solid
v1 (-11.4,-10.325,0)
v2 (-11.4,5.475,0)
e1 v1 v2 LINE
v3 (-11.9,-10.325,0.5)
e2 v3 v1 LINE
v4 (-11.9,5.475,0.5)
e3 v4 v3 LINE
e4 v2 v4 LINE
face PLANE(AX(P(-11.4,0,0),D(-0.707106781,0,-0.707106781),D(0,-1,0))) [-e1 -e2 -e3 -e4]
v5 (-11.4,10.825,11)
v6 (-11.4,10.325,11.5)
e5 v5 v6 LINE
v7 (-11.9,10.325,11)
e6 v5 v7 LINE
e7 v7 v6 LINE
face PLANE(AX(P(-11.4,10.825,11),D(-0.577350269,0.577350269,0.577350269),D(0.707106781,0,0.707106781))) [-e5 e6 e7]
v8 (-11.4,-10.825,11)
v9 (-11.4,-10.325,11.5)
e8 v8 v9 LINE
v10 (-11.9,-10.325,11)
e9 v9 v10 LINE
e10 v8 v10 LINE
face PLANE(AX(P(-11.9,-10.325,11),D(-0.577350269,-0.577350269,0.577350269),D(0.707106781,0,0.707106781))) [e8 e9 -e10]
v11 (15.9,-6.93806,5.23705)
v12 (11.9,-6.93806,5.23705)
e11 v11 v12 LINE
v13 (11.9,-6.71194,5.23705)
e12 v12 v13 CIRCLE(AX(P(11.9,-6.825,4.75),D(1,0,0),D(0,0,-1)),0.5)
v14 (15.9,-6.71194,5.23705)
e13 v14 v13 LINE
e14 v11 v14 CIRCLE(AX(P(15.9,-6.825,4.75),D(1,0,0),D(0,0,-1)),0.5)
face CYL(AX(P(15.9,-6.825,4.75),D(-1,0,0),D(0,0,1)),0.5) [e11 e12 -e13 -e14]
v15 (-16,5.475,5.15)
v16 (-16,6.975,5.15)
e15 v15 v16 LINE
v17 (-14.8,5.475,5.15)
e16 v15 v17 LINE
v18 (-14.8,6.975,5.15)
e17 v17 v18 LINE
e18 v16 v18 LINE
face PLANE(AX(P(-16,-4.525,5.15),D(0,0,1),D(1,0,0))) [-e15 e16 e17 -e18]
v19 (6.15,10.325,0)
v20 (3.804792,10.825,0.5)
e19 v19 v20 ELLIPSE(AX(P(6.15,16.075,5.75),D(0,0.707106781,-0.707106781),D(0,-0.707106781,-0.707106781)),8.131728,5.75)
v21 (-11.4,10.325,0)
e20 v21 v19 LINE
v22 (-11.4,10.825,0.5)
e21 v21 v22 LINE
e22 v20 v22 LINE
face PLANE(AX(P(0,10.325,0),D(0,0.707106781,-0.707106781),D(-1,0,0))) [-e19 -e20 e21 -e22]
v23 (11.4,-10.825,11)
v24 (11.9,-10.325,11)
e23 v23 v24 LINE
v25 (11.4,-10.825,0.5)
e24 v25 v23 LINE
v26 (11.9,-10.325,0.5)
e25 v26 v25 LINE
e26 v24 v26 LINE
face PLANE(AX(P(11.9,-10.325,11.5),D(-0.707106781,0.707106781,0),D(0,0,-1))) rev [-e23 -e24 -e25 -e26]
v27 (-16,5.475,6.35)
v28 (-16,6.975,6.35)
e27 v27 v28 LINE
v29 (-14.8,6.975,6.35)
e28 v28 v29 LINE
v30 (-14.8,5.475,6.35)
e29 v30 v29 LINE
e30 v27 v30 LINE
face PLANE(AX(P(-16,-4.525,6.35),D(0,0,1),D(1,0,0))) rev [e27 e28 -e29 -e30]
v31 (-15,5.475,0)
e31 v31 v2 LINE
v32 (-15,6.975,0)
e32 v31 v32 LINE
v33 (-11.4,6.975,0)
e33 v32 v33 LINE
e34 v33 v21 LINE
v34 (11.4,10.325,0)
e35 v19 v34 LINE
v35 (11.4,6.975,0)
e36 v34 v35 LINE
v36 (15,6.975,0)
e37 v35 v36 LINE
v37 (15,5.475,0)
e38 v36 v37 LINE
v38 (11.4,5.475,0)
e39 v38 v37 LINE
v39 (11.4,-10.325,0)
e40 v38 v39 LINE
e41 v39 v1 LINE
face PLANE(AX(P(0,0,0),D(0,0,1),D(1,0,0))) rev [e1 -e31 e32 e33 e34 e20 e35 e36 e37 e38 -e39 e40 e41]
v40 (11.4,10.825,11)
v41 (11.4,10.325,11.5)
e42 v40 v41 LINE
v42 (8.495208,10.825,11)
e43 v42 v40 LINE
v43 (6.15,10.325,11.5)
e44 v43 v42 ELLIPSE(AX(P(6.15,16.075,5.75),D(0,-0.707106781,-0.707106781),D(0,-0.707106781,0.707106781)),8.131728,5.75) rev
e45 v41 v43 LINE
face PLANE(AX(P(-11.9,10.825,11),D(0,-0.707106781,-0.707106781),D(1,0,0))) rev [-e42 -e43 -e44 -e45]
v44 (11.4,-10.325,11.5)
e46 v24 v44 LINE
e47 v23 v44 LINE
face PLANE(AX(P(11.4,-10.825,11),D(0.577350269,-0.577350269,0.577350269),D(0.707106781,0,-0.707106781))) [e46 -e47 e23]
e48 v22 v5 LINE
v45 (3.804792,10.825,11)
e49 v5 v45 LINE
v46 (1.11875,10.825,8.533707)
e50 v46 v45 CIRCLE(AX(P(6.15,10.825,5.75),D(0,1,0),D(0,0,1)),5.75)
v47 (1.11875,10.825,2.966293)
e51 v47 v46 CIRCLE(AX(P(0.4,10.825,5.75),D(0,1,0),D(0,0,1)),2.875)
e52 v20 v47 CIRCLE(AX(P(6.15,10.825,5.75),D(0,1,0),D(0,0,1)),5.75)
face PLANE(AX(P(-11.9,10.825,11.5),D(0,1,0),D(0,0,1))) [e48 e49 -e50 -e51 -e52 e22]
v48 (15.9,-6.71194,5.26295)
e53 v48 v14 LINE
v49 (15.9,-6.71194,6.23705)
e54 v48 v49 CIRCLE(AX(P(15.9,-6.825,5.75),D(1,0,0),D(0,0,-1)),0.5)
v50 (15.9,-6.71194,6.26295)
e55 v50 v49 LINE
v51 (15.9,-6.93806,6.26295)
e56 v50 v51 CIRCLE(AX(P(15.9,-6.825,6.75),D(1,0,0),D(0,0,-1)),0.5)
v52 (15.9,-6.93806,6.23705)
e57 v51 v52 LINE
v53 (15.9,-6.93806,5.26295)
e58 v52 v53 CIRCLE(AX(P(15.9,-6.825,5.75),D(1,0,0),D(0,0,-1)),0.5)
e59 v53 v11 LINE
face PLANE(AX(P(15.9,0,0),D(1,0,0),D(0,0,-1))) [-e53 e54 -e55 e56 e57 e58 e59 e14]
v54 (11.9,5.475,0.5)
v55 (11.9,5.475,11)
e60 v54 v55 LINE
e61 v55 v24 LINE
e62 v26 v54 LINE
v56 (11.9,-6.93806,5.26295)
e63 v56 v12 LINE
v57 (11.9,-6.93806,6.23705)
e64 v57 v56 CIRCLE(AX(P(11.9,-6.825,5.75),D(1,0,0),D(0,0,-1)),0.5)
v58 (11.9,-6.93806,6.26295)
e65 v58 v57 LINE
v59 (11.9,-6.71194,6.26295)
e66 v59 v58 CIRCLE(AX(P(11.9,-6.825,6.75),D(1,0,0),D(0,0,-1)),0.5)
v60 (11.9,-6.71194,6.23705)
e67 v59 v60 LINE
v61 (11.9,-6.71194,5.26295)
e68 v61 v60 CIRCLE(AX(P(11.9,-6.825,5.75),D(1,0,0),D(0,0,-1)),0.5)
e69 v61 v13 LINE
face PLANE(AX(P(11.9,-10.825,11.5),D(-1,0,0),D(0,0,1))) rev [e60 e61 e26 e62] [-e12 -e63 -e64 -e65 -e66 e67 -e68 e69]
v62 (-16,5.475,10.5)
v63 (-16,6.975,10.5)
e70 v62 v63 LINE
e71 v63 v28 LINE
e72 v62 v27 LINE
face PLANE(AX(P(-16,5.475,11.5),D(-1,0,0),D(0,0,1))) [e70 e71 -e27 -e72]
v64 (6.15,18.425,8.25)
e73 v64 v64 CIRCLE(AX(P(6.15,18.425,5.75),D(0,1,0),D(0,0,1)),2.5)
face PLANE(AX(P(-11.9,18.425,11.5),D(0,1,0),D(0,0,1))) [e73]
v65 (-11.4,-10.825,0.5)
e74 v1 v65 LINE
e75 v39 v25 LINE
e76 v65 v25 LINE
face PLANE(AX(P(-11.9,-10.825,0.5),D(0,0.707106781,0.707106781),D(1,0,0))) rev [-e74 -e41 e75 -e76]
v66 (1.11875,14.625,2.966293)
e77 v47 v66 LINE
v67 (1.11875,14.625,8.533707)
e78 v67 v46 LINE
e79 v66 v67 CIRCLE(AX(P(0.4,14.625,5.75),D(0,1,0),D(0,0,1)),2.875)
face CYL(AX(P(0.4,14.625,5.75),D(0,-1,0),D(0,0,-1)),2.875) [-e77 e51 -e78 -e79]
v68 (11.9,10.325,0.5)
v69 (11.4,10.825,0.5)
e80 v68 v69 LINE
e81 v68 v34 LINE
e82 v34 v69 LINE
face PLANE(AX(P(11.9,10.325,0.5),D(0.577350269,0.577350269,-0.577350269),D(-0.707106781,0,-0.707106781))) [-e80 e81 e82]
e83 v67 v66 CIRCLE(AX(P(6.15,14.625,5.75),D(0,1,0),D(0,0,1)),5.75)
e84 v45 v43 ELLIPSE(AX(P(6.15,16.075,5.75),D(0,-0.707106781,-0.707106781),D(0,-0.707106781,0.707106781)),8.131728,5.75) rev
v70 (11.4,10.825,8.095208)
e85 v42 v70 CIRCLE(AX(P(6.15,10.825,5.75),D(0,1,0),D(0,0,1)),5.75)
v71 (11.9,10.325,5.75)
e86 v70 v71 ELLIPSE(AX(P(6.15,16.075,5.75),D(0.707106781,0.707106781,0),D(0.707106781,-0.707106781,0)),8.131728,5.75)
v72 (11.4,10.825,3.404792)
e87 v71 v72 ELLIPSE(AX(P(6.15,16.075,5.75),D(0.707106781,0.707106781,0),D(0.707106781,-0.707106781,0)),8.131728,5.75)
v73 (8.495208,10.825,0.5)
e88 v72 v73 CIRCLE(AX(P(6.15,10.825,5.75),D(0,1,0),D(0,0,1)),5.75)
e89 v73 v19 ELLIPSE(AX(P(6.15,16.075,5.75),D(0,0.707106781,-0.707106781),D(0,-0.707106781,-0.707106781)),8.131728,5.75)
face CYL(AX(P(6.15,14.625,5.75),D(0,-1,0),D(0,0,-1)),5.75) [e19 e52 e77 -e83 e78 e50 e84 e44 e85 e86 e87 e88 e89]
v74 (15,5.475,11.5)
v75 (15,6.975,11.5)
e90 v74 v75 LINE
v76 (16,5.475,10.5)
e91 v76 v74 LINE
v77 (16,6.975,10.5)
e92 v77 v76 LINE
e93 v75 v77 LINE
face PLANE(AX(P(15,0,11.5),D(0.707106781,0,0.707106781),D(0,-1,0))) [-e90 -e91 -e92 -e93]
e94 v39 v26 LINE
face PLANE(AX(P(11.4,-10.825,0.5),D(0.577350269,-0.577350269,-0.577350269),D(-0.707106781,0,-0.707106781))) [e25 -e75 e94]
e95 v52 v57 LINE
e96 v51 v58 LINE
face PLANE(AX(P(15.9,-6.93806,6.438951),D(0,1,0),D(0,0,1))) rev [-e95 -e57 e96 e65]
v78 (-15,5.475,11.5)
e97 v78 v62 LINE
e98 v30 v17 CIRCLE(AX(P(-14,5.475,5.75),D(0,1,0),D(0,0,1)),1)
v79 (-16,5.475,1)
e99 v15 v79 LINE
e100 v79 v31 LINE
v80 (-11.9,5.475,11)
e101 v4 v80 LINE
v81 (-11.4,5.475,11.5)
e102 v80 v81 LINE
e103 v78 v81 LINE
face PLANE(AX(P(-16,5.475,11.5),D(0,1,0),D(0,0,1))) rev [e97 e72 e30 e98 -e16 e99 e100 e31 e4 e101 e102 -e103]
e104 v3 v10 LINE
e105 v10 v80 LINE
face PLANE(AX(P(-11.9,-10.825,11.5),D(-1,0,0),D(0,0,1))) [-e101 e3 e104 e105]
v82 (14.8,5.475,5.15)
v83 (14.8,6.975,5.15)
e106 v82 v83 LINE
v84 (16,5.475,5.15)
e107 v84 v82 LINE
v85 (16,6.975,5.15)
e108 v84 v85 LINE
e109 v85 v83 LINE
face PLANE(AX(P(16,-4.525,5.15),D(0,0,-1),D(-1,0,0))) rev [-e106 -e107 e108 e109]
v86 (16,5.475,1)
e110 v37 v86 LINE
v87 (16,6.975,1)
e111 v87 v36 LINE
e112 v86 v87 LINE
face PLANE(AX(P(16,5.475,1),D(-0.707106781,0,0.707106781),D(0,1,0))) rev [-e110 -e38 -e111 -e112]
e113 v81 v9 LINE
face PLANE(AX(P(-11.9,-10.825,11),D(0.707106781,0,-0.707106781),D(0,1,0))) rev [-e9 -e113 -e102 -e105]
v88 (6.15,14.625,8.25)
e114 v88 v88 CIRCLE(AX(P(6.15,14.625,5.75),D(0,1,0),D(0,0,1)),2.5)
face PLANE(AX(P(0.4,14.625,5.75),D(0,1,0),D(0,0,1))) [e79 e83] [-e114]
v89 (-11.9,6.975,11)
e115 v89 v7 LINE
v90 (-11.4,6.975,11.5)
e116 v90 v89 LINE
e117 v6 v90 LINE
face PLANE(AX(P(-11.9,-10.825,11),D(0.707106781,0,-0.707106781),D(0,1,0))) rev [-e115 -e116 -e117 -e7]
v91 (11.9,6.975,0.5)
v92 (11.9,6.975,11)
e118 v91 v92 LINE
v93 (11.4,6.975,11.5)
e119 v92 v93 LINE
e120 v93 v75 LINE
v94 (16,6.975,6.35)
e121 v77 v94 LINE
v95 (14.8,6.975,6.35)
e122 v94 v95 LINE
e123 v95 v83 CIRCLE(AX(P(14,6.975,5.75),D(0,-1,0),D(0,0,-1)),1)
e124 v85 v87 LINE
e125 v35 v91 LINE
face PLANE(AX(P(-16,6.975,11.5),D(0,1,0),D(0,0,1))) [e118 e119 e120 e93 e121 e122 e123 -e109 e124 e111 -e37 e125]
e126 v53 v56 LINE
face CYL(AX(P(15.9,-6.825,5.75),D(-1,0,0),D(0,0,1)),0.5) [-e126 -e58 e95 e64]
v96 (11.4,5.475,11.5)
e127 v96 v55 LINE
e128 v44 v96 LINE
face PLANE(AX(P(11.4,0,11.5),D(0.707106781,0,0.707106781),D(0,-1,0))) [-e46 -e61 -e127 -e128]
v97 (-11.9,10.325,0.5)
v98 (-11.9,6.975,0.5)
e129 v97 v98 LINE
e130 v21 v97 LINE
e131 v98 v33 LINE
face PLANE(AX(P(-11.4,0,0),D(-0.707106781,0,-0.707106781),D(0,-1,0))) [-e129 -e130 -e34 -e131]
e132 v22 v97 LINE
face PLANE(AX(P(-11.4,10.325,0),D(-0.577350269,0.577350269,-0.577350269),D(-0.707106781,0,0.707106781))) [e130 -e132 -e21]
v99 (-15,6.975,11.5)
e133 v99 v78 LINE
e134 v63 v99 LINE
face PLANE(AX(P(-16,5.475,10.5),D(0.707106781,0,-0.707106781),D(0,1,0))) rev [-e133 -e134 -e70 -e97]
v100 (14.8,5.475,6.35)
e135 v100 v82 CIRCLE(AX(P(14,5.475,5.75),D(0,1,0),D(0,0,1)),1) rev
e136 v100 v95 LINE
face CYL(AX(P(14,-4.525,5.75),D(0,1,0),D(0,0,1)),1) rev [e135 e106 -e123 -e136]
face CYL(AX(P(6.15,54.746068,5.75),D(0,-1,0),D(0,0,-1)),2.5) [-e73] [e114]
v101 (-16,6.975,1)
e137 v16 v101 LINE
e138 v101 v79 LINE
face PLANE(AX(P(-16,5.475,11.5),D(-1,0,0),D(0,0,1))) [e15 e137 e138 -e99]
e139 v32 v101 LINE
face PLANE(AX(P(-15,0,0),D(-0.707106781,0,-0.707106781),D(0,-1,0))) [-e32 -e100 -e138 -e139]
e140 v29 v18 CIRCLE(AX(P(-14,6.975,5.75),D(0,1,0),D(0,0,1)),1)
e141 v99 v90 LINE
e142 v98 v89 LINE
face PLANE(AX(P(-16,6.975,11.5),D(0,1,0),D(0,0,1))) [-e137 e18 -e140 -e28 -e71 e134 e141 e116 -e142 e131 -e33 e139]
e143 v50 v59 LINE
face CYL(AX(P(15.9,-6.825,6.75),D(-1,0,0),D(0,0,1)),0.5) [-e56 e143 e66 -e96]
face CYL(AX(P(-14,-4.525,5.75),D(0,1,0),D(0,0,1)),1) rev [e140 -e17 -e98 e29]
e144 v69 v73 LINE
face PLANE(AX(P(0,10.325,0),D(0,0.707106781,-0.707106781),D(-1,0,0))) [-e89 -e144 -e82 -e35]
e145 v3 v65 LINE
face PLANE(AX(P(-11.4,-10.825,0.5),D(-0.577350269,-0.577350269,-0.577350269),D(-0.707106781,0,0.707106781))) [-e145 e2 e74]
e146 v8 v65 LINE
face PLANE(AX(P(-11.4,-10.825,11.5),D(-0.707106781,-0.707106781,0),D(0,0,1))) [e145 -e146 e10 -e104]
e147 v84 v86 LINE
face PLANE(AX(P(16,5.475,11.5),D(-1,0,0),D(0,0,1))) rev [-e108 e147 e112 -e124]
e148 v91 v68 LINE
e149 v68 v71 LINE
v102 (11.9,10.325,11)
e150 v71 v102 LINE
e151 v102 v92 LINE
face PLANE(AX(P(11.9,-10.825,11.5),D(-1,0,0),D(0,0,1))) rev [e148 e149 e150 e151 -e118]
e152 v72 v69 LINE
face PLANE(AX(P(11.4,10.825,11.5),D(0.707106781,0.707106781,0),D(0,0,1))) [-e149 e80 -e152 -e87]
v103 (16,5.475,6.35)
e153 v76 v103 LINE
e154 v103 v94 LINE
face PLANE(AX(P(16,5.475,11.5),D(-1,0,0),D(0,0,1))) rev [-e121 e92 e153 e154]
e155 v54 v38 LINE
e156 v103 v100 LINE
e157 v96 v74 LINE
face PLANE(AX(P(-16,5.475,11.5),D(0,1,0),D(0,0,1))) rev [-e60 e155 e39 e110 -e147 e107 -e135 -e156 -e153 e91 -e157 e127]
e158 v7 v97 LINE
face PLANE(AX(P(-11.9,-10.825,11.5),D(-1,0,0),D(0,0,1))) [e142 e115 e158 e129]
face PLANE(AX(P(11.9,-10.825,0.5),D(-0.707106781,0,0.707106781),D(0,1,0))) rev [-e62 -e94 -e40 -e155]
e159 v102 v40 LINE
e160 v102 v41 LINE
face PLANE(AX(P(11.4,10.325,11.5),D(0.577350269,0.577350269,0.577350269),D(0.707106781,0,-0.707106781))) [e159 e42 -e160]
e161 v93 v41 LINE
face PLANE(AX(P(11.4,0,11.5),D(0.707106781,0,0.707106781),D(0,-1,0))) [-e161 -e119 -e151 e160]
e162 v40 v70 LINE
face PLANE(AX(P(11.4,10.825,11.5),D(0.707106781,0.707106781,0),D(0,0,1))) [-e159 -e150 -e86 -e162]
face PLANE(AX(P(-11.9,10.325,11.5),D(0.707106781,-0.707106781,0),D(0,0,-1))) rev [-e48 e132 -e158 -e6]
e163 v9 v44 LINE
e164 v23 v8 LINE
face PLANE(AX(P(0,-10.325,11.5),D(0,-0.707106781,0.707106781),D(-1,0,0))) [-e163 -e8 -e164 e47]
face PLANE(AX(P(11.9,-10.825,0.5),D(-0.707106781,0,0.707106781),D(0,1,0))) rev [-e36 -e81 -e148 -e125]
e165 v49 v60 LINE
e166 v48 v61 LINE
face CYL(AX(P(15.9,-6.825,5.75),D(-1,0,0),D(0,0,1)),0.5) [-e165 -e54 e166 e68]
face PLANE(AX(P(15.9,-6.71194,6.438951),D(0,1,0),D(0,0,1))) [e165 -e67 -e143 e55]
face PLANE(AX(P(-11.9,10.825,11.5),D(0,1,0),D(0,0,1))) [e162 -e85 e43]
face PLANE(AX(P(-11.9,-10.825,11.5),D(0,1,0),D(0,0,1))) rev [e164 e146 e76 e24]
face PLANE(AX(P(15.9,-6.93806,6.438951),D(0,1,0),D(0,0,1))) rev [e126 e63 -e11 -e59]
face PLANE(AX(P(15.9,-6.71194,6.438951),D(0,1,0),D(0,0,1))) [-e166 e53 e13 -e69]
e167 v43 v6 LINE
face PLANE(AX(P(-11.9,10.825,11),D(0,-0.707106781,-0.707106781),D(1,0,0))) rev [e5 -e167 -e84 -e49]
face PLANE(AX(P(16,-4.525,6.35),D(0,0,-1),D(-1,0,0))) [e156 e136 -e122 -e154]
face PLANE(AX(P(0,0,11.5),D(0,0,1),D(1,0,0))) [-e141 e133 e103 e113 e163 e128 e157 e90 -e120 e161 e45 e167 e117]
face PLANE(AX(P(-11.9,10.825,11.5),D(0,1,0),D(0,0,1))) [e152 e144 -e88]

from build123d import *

# Parameters (mm, degrees)
SKETCH_1_W          = 23.8
SKETCH_1_H          = 21.65
SKETCH_1_W_2        = 32
SKETCH_1_H_2        = 1.5
EXTRUDE_1_DEPTH     = 11.5
SKETCH_2_R          = 1
SKETCH_2_W          = 1.2
SKETCH_2_H          = 1.2
CUT_EXTRUDE_1_DEPTH = 11.5
SKETCH_3_R          = 5.75
SKETCH_3_R_2        = 2.875
EXTRUDE_2_DEPTH     = 3.8
SKETCH_4_R          = 2.5
EXTRUDE_3_DEPTH     = 3.8
CHAMFER_1_SIZE      = 1
CHAMFER_2_SIZE      = 0.5
SKETCH_5_R          = 0.5
SKETCH_5_W          = 1.377901166
SKETCH_5_H          = 0.226119028
EXTRUDE_5_DEPTH     = 4


with BuildPart() as part:
    # Эскиз1 → Бобышка-Вытянуть1 (new body)
    with BuildSketch(Plane.XY):
        Rectangle(SKETCH_1_W, SKETCH_1_H)
        with Locations((0, 6.225)):
            Rectangle(SKETCH_1_W_2, SKETCH_1_H_2)
    extrude(amount=EXTRUDE_1_DEPTH)

    # Эскиз2 → Вырез-Вытянуть1 (cut)
    with BuildSketch(Plane(origin=(0, 6.975, 0), x_dir=(1, 0, 0), z_dir=(0, 1, 0))):
        with Locations((-14, -5.75)):
            Circle(SKETCH_2_R)
        with Locations((14, -5.75)):
            Circle(SKETCH_2_R)
        with Locations((-15.4, -5.75)):
            Rectangle(SKETCH_2_W, SKETCH_2_H)
        with Locations((15.4, -5.75)):
            Rectangle(SKETCH_2_W, SKETCH_2_H)
    extrude(amount=-CUT_EXTRUDE_1_DEPTH, mode=Mode.SUBTRACT)

    # Эскиз3 → Бобышка-Вытянуть2 (add)
    with BuildSketch(Plane(origin=(0, 10.825, 0), x_dir=(1, 0, 0), z_dir=(0, 1, 0))):
        with Locations((6.15, -5.75)):
            Circle(SKETCH_3_R)
        with Locations((0.4, -5.75)):
            Circle(SKETCH_3_R_2)
    extrude(amount=EXTRUDE_2_DEPTH)

    # Эскиз4 → Бобышка-Вытянуть3 (add)
    with BuildSketch(Plane(origin=(0, 14.625, 0), x_dir=(1, 0, 0), z_dir=(0, 1, 0))):
        with Locations(Location((6.15, -5.75, 0), (0, 0, 270))):
            Circle(SKETCH_4_R)
    extrude(amount=EXTRUDE_3_DEPTH)

    # Фаска1
    chamfer_1_edges = [part.edges().sort_by_distance(p)[0] for p in [
        (-16, 6.225, 11.5),
        (-16, 6.225, 0),
        (16, 6.225, 0),
        (16, 6.225, 11.5),
    ]]
    chamfer(chamfer_1_edges, length=CHAMFER_1_SIZE)

    # Фаска2
    # the kernel refuses this chamfer: 0.5 mm, written as the material it takes off along each edge
    with BuildSketch(Plane(origin=(11.566666667, -10.491666667, 0.333333333), x_dir=(0.7071067811865476, 0, 0.7071067811865475), z_dir=(0.5773502691896257, -0.5773502691896258, -0.5773502691896258)), Plane(origin=(-11.566666667, 10.491666667, 11.166666667), x_dir=(-0.7071067811865475, -0.7071067811865475, 0), z_dir=(-0.5773502691896258, 0.5773502691896258, 0.5773502691896258)), Plane(origin=(-11.566666667, -10.491666667, 0.333333333), x_dir=(0, -0.7071067811865476, 0.7071067811865475), z_dir=(-0.5773502691896257, -0.5773502691896257, -0.5773502691896258)), Plane(origin=(11.566666667, 10.491666667, 0.333333333), x_dir=(0, 0.7071067811865476, 0.7071067811865475), z_dir=(0.5773502691896257, 0.5773502691896257, -0.5773502691896258))) as chamfer_2_piece_1:
        Polygon((-0.353553391, -0.204124145), (0.353553391, -0.204124145), (0, 0.40824829), align=None)
    extrude(amount=0.635085296, mode=Mode.SUBTRACT)
    with BuildSketch(Plane(origin=(11.566666667, -10.491666667, 11.166666667), x_dir=(-0.7071067811865475, -0.7071067811865475, 0), z_dir=(0.5773502691896258, -0.5773502691896258, 0.5773502691896258)), Plane(origin=(11.566666667, 10.491666667, 11.166666667), x_dir=(0.7071067811865475, -0.7071067811865475, 0), z_dir=(0.5773502691896258, 0.5773502691896258, 0.5773502691896258)), Plane(origin=(-11.566666667, 10.491666667, 0.333333333), x_dir=(0, 0.7071067811865476, 0.7071067811865475), z_dir=(-0.5773502691896257, 0.5773502691896257, -0.5773502691896258)), Plane(origin=(-11.566666667, -10.491666667, 11.166666667), x_dir=(0, -0.7071067811865475, -0.7071067811865475), z_dir=(-0.5773502691896258, -0.5773502691896258, 0.5773502691896258))) as chamfer_2_piece_2:
        Polygon((-0.353553391, 0.204124145), (0.353553391, 0.204124145), (0, -0.40824829), align=None)
    extrude(amount=0.635085296, mode=Mode.SUBTRACT)
    with BuildSketch(Plane(origin=(11.9, -10.825, -1.285841494), x_dir=(0.027495876610585647, 0.9996219169112968, 0), z_dir=(0, 0, 1)), Plane(origin=(-11.9, -10.825, -1.285841494), x_dir=(0.9996219169112968, -0.027495876610585647, 0), z_dir=(0, 0, 1))) as chamfer_2_piece_3:
        Polygon((CHAMFER_2_SIZE * 0.999621916911, CHAMFER_2_SIZE * 0.0274958766106), (-CHAMFER_2_SIZE * 0.0274958766106, CHAMFER_2_SIZE * 0.999621916911), (0, 0), align=None)
    extrude(amount=14.071682988, mode=Mode.SUBTRACT)
    with BuildSketch(Plane(origin=(11.9, 10.825, 5.75), x_dir=(0.027495876610585647, -0.9996219169112968, 0), z_dir=(0, 0, 1))) as chamfer_2_piece_4_section:
        Polygon((CHAMFER_2_SIZE * 0.999621916911, -CHAMFER_2_SIZE * 0.0274958766106), (-CHAMFER_2_SIZE * 0.0274958766106, -CHAMFER_2_SIZE * 0.999621916911), (0, 0), align=None)
    chamfer_2_piece_4 = extrude(amount=7.035841494, mode=Mode.PRIVATE)
    chamfer_2_piece_4 = chamfer_2_piece_4 - Plane(origin=(6.15, 10.65169011, 5.75), x_dir=(1, 0, 0), z_dir=(0, -1, 0)) * Cylinder(5.75, 17, mode=Mode.PRIVATE)
    add(chamfer_2_piece_4, mode=Mode.SUBTRACT)
    with BuildSketch(Plane(origin=(-11.9, 10.825, -1.285841494), x_dir=(0.9996219169112968, 0.027495876610585647, 0), z_dir=(0, 0, 1))) as chamfer_2_piece_5:
        Polygon((CHAMFER_2_SIZE * 0.999621916911, -CHAMFER_2_SIZE * 0.0274958766106), (-CHAMFER_2_SIZE * 0.0274958766106, -CHAMFER_2_SIZE * 0.999621916911), (0, 0), align=None)
    extrude(amount=14.071682988, mode=Mode.SUBTRACT)
    with BuildSketch(Plane(origin=(-11.9, 5.475, 11.5), x_dir=(-0.027495876610585647, 0, -0.9996219169112968), z_dir=(0, -1, 0)), Plane(origin=(11.9, -12.110841494, 11.5), x_dir=(0.027495876610585647, 0, -0.9996219169112968), z_dir=(0, 1, 0)), Plane(origin=(-11.9, 5.475, 0), x_dir=(0.9996219169112968, 0, -0.02749587661058639), z_dir=(0, -1, 0)), Plane(origin=(11.9, -12.110841494, 0), x_dir=(-0.9996219169112968, 0, -0.02749587661058639), z_dir=(0, 1, 0))) as chamfer_2_piece_6:
        Polygon((CHAMFER_2_SIZE * 0.999621916911, CHAMFER_2_SIZE * 0.0274958766106), (-CHAMFER_2_SIZE * 0.0274958766106, CHAMFER_2_SIZE * 0.999621916911), (0, 0), align=None)
    extrude(amount=17.585841494, mode=Mode.SUBTRACT)
    with BuildSketch(Plane(origin=(-11.9, 12.110841494, 11.5), x_dir=(-0.027495876610585647, 0, -0.9996219169112968), z_dir=(0, -1, 0)), Plane(origin=(11.9, 6.975, 11.5), x_dir=(0.027495876610585647, 0, -0.9996219169112968), z_dir=(0, 1, 0)), Plane(origin=(-11.9, 12.110841494, 0), x_dir=(0.9996219169112968, 0, -0.02749587661058639), z_dir=(0, -1, 0)), Plane(origin=(11.9, 6.975, 0), x_dir=(-0.9996219169112968, 0, -0.02749587661058639), z_dir=(0, 1, 0))) as chamfer_2_piece_7:
        Polygon((CHAMFER_2_SIZE * 0.999621916911, CHAMFER_2_SIZE * 0.0274958766106), (-CHAMFER_2_SIZE * 0.0274958766106, CHAMFER_2_SIZE * 0.999621916911), (0, 0), align=None)
    extrude(amount=5.135841494, mode=Mode.SUBTRACT)
    with BuildSketch(Plane(origin=(6.15, 10.825, 11.5), x_dir=(0, 0.027495876610585647, -0.9996219169112968), z_dir=(-1, 0, 0))) as chamfer_2_piece_8_section:
        Polygon((CHAMFER_2_SIZE * 0.999621916911, CHAMFER_2_SIZE * 0.0274958766106), (-CHAMFER_2_SIZE * 0.0274958766106, CHAMFER_2_SIZE * 0.999621916911), (0, 0), align=None)
    chamfer_2_piece_8 = extrude(amount=19.335841494, mode=Mode.PRIVATE)
    chamfer_2_piece_8 = chamfer_2_piece_8 - Plane(origin=(6.15, 10.656558796, 5.75), x_dir=(1, 0, 0), z_dir=(0, -1, 0)) * Cylinder(5.75, 41, mode=Mode.PRIVATE)
    add(chamfer_2_piece_8, mode=Mode.SUBTRACT)
    with BuildSketch(Plane(origin=(-13.185841494, -10.825, 11.5), x_dir=(0, -0.027495876610585647, -0.9996219169112968), z_dir=(1, 0, 0)), Plane(origin=(-13.185841494, -10.825, 0), x_dir=(0, 0.9996219169112968, -0.02749587661058639), z_dir=(1, 0, 0))) as chamfer_2_piece_9:
        Polygon((CHAMFER_2_SIZE * 0.999621916911, CHAMFER_2_SIZE * 0.0274958766106), (-CHAMFER_2_SIZE * 0.0274958766106, CHAMFER_2_SIZE * 0.999621916911), (0, 0), align=None)
    extrude(amount=26.371682988, mode=Mode.SUBTRACT)
    with BuildSketch(Plane(origin=(6.150000032, 10.825, 0), x_dir=(0, -0.9996219169112968, -0.02749587661058639), z_dir=(-1, 0, 0))) as chamfer_2_piece_10_section:
        Polygon((CHAMFER_2_SIZE * 0.999621916911, CHAMFER_2_SIZE * 0.0274958766106), (-CHAMFER_2_SIZE * 0.0274958766106, CHAMFER_2_SIZE * 0.999621916911), (0, 0), align=None)
    chamfer_2_piece_10 = extrude(amount=19.335841526, mode=Mode.PRIVATE)
    chamfer_2_piece_10 = chamfer_2_piece_10 - Plane(origin=(6.15, 10.656558796, 5.75), x_dir=(1, 0, 0), z_dir=(0, -1, 0)) * Cylinder(5.75, 41, mode=Mode.PRIVATE)
    add(chamfer_2_piece_10, mode=Mode.SUBTRACT)
    with BuildSketch(Plane(origin=(13.185841494, 10.825, 0), x_dir=(0, -0.9996219169112968, -0.02749587661058639), z_dir=(-1, 0, 0))) as chamfer_2_piece_11_section:
        Polygon((CHAMFER_2_SIZE * 0.999621916911, CHAMFER_2_SIZE * 0.0274958766106), (-CHAMFER_2_SIZE * 0.0274958766106, CHAMFER_2_SIZE * 0.999621916911), (0, 0), align=None)
    chamfer_2_piece_11 = extrude(amount=7.035841462, mode=Mode.PRIVATE)
    chamfer_2_piece_11 = chamfer_2_piece_11 - Plane(origin=(6.15, 10.65169011, 5.75), x_dir=(1, 0, 0), z_dir=(0, -1, 0)) * Cylinder(5.75, 17, mode=Mode.PRIVATE)
    add(chamfer_2_piece_11, mode=Mode.SUBTRACT)
    with BuildSketch(Plane(origin=(13.185841494, 10.825, 11.5), x_dir=(0, -0.9996219169112968, 0.027495876610585647), z_dir=(-1, 0, 0))) as chamfer_2_piece_12_section:
        Polygon((CHAMFER_2_SIZE * 0.999621916911, -CHAMFER_2_SIZE * 0.0274958766106), (-CHAMFER_2_SIZE * 0.0274958766106, -CHAMFER_2_SIZE * 0.999621916911), (0, 0), align=None)
    chamfer_2_piece_12 = extrude(amount=7.035841494, mode=Mode.PRIVATE)
    chamfer_2_piece_12 = chamfer_2_piece_12 - Plane(origin=(6.15, 10.65169011, 5.75), x_dir=(1, 0, 0), z_dir=(0, -1, 0)) * Cylinder(5.75, 17, mode=Mode.PRIVATE)
    add(chamfer_2_piece_12, mode=Mode.SUBTRACT)
    with BuildSketch(Plane(origin=(11.9, 10.825, -1.285841494), x_dir=(0.027495876610585647, -0.9996219169112968, 0), z_dir=(0, 0, 1))) as chamfer_2_piece_13_section:
        Polygon((CHAMFER_2_SIZE * 0.999621916911, -CHAMFER_2_SIZE * 0.0274958766106), (-CHAMFER_2_SIZE * 0.0274958766106, -CHAMFER_2_SIZE * 0.999621916911), (0, 0), align=None)
    chamfer_2_piece_13 = extrude(amount=7.035841494, mode=Mode.PRIVATE)
    chamfer_2_piece_13 = chamfer_2_piece_13 - Plane(origin=(6.15, 10.65169011, 5.75), x_dir=(1, 0, 0), z_dir=(0, -1, 0)) * Cylinder(5.75, 17, mode=Mode.PRIVATE)
    add(chamfer_2_piece_13, mode=Mode.SUBTRACT)

    # Эскиз5 → Бобышка-Вытянуть5 (add)
    with BuildSketch(Plane(origin=(11.9, 0, 0), x_dir=(0, 0, -1), z_dir=(1, 0, 0))):
        with Locations((-5.75, -6.825)):
            Circle(SKETCH_5_R)
        with Locations((-4.75, -6.825)):
            Circle(SKETCH_5_R)
        with Locations((-6.75, -6.825)):
            Circle(SKETCH_5_R)
        with Locations((-5.75, -6.825)):
            Rectangle(SKETCH_5_W, SKETCH_5_H)
    extrude(amount=EXTRUDE_5_DEPTH)


solid = part.part
